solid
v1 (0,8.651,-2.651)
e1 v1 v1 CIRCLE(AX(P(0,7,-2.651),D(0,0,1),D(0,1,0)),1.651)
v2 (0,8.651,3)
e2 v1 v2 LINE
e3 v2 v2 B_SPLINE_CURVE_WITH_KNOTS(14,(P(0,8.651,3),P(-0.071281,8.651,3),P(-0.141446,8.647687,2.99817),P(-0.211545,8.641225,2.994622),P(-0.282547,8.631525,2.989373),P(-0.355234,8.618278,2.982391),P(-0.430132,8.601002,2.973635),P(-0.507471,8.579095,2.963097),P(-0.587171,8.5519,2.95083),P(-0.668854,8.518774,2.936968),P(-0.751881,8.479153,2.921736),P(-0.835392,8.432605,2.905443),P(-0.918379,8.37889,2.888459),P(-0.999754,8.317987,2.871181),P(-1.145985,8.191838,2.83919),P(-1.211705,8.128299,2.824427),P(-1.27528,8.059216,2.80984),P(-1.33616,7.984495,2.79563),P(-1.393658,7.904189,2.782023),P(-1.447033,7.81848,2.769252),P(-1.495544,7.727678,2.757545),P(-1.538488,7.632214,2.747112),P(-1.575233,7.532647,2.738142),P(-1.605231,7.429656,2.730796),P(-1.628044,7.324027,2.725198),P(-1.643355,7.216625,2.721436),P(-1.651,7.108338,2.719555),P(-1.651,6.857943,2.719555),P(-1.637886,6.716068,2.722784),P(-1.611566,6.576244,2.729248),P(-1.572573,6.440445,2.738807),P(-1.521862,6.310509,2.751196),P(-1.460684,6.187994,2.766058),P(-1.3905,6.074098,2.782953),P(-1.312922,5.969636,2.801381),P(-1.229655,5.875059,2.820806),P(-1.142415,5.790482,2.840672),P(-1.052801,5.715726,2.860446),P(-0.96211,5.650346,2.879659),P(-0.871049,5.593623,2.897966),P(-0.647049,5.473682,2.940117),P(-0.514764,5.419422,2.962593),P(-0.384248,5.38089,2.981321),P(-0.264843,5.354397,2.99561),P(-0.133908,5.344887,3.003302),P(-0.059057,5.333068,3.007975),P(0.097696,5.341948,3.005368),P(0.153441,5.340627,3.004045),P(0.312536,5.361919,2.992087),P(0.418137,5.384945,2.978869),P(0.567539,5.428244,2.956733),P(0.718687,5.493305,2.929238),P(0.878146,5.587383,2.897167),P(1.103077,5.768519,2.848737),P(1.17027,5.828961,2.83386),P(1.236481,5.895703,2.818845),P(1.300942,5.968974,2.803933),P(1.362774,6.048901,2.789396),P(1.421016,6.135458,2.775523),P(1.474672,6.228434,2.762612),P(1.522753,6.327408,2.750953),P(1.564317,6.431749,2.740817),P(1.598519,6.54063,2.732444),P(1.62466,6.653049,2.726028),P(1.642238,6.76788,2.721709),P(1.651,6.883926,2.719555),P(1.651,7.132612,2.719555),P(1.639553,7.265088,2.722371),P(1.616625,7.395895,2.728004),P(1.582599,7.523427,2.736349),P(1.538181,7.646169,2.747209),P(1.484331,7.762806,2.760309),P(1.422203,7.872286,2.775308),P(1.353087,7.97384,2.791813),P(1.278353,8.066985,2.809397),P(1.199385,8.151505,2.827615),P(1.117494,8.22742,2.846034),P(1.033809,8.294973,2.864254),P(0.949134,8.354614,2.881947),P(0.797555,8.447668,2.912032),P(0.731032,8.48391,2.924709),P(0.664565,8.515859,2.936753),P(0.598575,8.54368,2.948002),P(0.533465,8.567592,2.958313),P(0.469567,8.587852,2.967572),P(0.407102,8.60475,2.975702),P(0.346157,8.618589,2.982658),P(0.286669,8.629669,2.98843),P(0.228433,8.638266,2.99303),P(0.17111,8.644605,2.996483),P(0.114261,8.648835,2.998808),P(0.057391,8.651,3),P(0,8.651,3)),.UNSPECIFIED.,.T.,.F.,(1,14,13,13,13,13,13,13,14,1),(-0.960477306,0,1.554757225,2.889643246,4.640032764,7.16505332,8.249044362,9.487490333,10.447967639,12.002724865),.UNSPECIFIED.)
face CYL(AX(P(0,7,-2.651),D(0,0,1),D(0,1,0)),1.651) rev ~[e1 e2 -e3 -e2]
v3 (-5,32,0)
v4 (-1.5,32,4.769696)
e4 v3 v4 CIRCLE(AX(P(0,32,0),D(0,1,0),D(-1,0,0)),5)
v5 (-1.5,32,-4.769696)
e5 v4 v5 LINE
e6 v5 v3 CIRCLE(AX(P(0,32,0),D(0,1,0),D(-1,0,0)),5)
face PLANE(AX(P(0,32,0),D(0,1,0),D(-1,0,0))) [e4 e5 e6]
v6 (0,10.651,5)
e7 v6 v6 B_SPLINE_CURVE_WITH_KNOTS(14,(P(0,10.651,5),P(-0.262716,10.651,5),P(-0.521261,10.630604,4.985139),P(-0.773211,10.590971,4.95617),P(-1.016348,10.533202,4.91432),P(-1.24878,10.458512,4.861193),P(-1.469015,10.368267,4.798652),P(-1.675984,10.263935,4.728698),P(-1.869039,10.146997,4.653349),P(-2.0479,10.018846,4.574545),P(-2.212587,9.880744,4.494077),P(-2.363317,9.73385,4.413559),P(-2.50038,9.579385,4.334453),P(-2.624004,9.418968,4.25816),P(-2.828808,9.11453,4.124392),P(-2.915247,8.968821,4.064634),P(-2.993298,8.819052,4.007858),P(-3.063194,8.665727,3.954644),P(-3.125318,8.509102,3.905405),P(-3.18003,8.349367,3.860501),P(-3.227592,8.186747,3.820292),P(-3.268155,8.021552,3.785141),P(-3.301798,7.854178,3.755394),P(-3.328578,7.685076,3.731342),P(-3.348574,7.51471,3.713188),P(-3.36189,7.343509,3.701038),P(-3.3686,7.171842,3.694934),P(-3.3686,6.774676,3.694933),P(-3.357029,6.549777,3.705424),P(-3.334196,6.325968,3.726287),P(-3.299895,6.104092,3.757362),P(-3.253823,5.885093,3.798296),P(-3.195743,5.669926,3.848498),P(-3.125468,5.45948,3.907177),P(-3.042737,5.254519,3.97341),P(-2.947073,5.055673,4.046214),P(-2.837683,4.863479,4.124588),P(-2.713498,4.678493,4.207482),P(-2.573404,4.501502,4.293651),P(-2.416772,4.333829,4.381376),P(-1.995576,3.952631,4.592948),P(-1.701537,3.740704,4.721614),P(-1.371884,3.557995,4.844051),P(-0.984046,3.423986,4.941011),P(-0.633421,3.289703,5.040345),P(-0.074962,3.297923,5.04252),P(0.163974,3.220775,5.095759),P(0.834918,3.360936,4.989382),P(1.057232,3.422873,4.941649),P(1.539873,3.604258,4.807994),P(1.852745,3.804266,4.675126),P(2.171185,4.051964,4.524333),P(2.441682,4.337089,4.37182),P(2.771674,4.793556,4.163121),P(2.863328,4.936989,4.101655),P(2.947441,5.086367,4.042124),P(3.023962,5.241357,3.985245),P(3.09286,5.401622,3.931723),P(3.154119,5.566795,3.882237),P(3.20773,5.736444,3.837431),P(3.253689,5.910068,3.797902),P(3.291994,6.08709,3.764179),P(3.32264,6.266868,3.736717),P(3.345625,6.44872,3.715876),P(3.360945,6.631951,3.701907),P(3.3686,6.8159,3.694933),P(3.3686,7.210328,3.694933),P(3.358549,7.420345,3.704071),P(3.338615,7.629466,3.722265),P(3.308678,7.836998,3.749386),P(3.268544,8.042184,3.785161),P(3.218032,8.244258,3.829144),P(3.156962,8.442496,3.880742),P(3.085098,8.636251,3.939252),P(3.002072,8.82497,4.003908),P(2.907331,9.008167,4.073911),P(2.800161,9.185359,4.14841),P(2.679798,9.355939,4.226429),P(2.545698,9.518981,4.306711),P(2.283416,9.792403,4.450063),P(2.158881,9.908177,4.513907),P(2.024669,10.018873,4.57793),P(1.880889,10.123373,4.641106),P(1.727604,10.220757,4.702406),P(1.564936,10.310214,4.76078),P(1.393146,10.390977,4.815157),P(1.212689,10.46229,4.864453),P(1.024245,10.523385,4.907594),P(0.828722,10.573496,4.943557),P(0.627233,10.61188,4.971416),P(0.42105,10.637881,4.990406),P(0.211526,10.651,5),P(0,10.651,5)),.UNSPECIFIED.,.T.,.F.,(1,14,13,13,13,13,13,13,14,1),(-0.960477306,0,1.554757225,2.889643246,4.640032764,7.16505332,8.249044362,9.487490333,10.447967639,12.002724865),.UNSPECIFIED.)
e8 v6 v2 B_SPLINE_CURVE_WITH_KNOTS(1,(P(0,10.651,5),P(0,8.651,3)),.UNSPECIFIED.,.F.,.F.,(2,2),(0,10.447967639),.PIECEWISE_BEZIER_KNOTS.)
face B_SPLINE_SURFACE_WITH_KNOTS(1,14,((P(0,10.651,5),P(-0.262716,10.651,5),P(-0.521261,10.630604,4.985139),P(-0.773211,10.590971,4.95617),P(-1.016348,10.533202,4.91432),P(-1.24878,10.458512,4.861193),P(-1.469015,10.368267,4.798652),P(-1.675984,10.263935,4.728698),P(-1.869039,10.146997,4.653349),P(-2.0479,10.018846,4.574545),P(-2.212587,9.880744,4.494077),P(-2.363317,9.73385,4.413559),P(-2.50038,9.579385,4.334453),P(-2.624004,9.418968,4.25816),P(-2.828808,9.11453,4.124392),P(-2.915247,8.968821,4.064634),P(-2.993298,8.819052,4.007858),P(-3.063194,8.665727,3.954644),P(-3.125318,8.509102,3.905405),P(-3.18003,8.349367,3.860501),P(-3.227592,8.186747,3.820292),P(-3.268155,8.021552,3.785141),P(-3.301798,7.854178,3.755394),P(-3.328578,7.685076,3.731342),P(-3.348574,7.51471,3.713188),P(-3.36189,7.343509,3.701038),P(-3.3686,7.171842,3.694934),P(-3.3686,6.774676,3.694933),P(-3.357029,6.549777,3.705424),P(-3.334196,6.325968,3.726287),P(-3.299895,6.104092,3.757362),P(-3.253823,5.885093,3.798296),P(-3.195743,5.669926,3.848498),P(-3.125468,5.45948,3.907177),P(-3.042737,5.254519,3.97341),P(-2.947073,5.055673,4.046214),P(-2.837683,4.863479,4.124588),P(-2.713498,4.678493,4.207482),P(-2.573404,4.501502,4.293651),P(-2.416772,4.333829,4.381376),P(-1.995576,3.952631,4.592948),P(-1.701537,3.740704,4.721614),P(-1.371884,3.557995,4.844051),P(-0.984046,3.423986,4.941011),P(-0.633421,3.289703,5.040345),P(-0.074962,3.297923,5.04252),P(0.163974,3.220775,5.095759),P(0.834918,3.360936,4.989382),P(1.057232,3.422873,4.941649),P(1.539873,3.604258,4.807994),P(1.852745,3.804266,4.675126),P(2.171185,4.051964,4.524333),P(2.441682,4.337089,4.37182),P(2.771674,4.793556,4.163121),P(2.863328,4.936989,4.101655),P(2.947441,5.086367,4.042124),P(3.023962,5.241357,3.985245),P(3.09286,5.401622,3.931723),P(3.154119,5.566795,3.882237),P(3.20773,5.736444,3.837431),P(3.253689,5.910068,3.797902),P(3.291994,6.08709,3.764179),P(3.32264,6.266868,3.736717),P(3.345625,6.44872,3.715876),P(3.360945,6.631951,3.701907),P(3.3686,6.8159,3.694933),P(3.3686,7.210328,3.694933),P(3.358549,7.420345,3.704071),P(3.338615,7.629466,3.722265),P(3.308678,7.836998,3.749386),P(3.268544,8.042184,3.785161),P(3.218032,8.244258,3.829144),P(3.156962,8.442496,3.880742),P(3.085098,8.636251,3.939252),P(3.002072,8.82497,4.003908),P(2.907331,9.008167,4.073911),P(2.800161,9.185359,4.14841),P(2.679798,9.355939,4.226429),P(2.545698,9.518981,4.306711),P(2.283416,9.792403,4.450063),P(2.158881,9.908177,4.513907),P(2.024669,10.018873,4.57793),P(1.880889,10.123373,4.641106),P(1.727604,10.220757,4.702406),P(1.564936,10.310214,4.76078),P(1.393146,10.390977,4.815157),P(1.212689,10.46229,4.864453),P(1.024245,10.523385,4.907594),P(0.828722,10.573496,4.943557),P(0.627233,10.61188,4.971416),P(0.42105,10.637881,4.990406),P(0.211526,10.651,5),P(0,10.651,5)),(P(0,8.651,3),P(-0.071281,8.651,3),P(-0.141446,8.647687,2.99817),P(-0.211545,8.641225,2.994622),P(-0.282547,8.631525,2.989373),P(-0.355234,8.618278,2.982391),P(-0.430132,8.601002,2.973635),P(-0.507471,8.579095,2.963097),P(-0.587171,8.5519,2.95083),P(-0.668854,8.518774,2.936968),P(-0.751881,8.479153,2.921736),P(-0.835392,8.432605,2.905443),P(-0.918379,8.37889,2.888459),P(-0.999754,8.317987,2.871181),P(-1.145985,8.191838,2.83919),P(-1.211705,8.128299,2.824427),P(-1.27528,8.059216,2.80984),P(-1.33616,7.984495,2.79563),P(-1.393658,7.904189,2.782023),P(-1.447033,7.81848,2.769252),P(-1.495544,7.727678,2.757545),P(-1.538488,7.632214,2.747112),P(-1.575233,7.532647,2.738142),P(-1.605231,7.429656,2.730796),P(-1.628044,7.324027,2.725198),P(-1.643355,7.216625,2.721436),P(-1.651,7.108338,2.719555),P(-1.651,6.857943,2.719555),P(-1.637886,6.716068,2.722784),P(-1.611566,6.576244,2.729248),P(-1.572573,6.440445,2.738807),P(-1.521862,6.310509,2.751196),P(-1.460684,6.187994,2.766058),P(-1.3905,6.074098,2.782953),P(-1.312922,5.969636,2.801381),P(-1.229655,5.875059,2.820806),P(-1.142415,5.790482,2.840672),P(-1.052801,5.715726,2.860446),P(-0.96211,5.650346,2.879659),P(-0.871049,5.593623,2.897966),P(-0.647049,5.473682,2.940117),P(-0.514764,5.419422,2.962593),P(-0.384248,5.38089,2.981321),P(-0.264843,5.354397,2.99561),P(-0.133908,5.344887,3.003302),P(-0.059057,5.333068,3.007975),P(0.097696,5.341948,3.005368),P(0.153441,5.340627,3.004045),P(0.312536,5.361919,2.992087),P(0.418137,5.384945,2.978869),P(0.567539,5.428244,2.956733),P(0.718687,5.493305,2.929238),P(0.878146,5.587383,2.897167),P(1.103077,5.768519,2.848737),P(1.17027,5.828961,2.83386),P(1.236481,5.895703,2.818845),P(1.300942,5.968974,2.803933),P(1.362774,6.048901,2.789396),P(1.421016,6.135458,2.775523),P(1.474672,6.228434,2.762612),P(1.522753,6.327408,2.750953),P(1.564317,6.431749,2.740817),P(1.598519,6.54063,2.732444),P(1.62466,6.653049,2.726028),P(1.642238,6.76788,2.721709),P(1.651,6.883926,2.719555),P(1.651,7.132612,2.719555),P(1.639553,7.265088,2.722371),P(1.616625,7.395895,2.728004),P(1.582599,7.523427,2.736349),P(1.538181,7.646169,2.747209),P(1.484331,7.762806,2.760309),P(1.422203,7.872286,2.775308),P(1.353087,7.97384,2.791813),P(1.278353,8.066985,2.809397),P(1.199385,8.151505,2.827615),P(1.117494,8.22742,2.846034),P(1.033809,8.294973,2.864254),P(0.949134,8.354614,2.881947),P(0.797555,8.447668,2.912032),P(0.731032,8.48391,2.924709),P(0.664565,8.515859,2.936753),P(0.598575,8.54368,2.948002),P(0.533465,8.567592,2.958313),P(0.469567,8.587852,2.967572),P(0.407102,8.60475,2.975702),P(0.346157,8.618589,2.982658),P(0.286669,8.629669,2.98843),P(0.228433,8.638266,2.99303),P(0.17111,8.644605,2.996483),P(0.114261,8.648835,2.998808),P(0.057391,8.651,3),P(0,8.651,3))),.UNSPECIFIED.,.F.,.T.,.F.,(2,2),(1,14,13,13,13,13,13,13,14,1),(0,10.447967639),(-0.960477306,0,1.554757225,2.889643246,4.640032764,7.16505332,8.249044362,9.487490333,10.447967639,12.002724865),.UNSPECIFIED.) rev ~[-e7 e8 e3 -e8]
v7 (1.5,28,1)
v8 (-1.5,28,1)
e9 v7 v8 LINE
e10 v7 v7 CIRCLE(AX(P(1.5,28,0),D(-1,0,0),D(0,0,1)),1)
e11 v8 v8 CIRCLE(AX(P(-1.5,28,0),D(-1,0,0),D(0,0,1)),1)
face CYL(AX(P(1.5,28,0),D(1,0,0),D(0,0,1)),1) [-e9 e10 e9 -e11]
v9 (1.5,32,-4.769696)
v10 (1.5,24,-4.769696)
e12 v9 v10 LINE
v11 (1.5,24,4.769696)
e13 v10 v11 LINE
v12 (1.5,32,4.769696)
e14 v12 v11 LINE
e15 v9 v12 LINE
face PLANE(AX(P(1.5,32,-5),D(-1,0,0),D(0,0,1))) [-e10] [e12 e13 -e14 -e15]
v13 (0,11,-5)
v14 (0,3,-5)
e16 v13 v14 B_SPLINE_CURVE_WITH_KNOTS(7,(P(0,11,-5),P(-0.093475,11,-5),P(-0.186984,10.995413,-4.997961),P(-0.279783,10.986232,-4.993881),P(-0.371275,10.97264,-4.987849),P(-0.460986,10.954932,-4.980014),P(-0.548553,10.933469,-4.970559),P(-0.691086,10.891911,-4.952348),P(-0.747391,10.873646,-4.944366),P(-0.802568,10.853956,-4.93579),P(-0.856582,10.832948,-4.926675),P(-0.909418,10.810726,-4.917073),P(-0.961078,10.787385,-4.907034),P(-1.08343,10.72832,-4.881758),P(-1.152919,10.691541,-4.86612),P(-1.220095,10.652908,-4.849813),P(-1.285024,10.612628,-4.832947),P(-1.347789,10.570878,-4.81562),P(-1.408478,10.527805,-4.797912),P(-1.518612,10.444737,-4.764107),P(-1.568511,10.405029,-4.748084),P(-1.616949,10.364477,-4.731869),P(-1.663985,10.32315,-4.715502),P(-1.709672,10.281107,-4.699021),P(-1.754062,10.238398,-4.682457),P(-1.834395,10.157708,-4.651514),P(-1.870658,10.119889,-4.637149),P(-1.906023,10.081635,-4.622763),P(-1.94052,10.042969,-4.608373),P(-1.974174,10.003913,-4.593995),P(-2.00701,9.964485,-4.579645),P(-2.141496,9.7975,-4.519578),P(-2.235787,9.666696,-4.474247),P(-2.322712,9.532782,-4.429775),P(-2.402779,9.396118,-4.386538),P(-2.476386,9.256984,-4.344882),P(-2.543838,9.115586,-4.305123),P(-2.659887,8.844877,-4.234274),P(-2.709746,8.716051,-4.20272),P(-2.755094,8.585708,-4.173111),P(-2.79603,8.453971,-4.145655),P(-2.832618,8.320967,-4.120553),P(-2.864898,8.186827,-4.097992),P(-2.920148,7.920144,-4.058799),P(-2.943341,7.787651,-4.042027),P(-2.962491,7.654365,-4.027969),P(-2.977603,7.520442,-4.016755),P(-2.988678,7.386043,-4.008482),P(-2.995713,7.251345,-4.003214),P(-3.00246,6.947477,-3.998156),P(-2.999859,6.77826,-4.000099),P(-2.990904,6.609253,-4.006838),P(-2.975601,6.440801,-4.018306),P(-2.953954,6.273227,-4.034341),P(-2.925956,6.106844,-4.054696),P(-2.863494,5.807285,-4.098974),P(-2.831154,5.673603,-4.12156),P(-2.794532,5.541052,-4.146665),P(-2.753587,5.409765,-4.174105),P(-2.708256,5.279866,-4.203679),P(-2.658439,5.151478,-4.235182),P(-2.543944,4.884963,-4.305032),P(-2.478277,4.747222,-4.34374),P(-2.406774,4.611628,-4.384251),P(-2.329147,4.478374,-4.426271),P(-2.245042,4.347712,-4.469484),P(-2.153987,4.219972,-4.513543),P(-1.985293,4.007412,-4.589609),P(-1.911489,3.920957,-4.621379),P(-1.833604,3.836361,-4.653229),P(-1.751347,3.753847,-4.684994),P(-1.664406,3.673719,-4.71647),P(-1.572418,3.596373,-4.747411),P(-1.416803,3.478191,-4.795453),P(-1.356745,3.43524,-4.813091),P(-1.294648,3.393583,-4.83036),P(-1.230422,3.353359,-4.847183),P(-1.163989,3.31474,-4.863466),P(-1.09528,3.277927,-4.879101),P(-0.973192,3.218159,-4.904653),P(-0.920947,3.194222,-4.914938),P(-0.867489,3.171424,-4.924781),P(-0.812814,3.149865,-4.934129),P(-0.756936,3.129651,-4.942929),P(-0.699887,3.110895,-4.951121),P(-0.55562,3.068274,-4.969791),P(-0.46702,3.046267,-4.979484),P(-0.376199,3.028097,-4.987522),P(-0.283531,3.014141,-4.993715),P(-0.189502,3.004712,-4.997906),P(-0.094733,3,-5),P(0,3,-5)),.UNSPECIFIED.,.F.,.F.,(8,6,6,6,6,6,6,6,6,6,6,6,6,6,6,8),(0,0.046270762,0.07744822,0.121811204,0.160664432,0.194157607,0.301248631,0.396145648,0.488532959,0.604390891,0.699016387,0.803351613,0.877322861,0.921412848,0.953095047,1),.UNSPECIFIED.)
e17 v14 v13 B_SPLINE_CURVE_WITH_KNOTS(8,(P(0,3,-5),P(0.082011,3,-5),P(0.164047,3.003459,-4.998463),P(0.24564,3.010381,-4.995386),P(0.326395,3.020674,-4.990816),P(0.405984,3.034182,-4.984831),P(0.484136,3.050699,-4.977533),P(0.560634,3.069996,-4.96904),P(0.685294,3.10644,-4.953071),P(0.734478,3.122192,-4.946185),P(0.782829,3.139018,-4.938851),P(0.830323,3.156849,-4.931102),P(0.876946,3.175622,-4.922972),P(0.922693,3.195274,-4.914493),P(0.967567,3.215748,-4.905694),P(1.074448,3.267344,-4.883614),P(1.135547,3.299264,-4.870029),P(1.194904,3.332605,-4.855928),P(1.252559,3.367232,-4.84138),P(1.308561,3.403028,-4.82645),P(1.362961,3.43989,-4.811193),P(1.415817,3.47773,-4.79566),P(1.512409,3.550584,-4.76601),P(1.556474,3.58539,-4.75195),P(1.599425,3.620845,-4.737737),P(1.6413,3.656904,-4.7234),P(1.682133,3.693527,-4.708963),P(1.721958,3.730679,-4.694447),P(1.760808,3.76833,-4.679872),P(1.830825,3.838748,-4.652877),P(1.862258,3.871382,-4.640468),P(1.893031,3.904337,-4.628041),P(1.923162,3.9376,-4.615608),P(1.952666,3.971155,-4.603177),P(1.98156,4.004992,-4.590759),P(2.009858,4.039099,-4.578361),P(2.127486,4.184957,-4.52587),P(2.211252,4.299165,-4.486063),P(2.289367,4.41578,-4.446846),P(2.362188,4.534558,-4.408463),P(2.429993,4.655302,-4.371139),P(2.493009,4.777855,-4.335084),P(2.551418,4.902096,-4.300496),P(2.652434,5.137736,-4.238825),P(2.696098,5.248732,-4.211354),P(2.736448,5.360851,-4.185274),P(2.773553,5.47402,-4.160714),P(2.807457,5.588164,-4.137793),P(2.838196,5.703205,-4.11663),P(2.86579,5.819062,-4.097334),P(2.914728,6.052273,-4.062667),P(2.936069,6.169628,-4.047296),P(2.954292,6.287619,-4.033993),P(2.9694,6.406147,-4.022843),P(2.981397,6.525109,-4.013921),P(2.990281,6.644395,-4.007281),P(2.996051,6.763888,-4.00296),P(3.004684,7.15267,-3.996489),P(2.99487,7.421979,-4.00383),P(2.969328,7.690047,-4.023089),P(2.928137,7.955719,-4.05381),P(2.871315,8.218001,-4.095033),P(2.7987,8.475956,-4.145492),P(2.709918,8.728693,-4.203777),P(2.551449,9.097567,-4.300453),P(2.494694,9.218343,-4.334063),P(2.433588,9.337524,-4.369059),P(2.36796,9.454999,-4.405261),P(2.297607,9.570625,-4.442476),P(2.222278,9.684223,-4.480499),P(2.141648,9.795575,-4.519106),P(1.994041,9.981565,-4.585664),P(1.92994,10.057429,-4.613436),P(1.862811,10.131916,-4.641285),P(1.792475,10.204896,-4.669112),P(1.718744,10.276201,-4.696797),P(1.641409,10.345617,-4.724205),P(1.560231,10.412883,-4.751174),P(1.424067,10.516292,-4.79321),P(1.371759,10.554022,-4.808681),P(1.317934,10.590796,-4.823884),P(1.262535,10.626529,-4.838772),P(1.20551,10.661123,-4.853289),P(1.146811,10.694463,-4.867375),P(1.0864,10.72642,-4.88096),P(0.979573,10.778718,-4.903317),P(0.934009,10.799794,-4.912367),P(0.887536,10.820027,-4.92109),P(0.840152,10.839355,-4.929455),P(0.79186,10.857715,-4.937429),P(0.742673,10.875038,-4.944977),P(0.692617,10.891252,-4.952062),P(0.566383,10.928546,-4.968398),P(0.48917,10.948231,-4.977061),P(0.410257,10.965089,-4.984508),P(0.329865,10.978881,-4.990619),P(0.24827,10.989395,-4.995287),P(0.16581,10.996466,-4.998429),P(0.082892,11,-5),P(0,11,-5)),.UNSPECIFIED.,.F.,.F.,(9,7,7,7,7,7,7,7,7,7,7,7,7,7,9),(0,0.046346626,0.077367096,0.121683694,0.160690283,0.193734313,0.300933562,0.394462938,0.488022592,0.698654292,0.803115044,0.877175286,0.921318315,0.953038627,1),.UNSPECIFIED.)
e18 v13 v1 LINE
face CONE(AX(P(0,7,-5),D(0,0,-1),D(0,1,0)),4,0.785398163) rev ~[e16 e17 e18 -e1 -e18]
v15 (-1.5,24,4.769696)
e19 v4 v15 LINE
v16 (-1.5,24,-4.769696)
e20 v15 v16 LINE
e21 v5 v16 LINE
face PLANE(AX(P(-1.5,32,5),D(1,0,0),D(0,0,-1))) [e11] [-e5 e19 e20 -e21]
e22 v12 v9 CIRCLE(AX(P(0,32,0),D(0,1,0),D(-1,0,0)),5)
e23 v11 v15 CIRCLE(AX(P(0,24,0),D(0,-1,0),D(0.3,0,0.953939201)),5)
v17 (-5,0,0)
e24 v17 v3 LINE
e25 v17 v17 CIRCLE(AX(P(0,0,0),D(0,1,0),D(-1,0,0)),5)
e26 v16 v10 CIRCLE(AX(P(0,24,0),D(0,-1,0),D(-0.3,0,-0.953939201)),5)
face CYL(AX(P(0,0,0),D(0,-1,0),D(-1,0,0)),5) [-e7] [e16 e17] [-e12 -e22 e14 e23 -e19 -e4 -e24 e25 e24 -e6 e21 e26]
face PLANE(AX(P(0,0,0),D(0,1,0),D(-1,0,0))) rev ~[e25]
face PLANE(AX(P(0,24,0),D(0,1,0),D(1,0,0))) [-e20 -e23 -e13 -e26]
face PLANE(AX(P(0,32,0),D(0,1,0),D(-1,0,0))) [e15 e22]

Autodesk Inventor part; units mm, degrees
ref_plane "YZ Plane" through (0, 0, 0) normal (1, 0, 0) x (0, 1, 0)
ref_plane "XZ Plane" through (0, 0, 0) normal (0, 1, 0) x (-1, 0, 0)
sketch "Sketch1" plane through (0, 0, 0) normal (0, 1, 0) x (-1, 0, 0)
  circle A0 centre (0, 0) radius 5
  dimension "d0" = 10
extrude "Extrusion1" add sketch "Sketch1" along normal blind 32
sketch "Sketch2" plane through (0, 32, 0) normal (0, 1, 0) x (1, 0, 0)
  line L0 (-1.5, 5) -> (1.5, 5)
  line L1 (1.5, 5) -> (1.5, -5)
  line L2 (1.5, -5) -> (-1.5, -5)
  line L3 (-1.5, -5) -> (-1.5, 5)
  point P0 (0, 0)
  point P1 (-1.5, 0)
  point P2 (0, 5)
  dimension "d3" = 3
  dimension "d4" = 10
extrude "Extrusion2" cut sketch "Sketch2" against normal blind 8
sketch "Sketch3" plane through (1.5, 32, -4.7697) normal (-1, 0, 0) x (0, 0, 1)
  circle A0 centre (4.7697, -4) radius 1
  line L0 (9.5394, 0) -> (0, 0) projected
  point P0 (4.7697, -32)
  point P1 (4.7697, 0)
  dimension "d7" = 2
  dimension "d8" = 4
extrude "Extrusion3" add sketch "Sketch3" along normal blind 3
ref_plane "Work Plane1" through (0, 0, -5) normal (0, 0, 1) x (1, 0, 0)
sketch "Sketch5" plane through (0, 0, -5) normal (0, 0, 1) x (1, 0, 0)
  point P0 (0, 0)
  point P1 (0, 7)
  dimension "d14" = 7
hole "Hole1" at (0, 7, -5) direction (0, 0, 1) diameter 3.302 end through all countersink diameter 8 countersink angle 90 thread size "8-32 UNC" class "2B" standard "ANSI Unified Screw Threads"
chamfer "Chamfer1" distance 2 angle 45 1 edges at (-0.2563, 5.369, 4.9934)
equation "\"d20\" = Thickness"
equation "\"BendRadius\" = Thickness"
equation "\"BendReliefWidth\" = Thickness"
equation "\"BendReliefDepth\" = 0.5 * Thickness"
equation "\"CornerReliefSize\" = 4 * Thickness"
equation "\"MinimumRemnant\" = 2 * Thickness"
equation "\"TransitionRadius\" = BendRadius"
equation "\"GapSize\" = Thickness"
equation "\"Thickness\" = 3.048"
properties part number "barrel_hinge-female" material "Stainless Steel"
